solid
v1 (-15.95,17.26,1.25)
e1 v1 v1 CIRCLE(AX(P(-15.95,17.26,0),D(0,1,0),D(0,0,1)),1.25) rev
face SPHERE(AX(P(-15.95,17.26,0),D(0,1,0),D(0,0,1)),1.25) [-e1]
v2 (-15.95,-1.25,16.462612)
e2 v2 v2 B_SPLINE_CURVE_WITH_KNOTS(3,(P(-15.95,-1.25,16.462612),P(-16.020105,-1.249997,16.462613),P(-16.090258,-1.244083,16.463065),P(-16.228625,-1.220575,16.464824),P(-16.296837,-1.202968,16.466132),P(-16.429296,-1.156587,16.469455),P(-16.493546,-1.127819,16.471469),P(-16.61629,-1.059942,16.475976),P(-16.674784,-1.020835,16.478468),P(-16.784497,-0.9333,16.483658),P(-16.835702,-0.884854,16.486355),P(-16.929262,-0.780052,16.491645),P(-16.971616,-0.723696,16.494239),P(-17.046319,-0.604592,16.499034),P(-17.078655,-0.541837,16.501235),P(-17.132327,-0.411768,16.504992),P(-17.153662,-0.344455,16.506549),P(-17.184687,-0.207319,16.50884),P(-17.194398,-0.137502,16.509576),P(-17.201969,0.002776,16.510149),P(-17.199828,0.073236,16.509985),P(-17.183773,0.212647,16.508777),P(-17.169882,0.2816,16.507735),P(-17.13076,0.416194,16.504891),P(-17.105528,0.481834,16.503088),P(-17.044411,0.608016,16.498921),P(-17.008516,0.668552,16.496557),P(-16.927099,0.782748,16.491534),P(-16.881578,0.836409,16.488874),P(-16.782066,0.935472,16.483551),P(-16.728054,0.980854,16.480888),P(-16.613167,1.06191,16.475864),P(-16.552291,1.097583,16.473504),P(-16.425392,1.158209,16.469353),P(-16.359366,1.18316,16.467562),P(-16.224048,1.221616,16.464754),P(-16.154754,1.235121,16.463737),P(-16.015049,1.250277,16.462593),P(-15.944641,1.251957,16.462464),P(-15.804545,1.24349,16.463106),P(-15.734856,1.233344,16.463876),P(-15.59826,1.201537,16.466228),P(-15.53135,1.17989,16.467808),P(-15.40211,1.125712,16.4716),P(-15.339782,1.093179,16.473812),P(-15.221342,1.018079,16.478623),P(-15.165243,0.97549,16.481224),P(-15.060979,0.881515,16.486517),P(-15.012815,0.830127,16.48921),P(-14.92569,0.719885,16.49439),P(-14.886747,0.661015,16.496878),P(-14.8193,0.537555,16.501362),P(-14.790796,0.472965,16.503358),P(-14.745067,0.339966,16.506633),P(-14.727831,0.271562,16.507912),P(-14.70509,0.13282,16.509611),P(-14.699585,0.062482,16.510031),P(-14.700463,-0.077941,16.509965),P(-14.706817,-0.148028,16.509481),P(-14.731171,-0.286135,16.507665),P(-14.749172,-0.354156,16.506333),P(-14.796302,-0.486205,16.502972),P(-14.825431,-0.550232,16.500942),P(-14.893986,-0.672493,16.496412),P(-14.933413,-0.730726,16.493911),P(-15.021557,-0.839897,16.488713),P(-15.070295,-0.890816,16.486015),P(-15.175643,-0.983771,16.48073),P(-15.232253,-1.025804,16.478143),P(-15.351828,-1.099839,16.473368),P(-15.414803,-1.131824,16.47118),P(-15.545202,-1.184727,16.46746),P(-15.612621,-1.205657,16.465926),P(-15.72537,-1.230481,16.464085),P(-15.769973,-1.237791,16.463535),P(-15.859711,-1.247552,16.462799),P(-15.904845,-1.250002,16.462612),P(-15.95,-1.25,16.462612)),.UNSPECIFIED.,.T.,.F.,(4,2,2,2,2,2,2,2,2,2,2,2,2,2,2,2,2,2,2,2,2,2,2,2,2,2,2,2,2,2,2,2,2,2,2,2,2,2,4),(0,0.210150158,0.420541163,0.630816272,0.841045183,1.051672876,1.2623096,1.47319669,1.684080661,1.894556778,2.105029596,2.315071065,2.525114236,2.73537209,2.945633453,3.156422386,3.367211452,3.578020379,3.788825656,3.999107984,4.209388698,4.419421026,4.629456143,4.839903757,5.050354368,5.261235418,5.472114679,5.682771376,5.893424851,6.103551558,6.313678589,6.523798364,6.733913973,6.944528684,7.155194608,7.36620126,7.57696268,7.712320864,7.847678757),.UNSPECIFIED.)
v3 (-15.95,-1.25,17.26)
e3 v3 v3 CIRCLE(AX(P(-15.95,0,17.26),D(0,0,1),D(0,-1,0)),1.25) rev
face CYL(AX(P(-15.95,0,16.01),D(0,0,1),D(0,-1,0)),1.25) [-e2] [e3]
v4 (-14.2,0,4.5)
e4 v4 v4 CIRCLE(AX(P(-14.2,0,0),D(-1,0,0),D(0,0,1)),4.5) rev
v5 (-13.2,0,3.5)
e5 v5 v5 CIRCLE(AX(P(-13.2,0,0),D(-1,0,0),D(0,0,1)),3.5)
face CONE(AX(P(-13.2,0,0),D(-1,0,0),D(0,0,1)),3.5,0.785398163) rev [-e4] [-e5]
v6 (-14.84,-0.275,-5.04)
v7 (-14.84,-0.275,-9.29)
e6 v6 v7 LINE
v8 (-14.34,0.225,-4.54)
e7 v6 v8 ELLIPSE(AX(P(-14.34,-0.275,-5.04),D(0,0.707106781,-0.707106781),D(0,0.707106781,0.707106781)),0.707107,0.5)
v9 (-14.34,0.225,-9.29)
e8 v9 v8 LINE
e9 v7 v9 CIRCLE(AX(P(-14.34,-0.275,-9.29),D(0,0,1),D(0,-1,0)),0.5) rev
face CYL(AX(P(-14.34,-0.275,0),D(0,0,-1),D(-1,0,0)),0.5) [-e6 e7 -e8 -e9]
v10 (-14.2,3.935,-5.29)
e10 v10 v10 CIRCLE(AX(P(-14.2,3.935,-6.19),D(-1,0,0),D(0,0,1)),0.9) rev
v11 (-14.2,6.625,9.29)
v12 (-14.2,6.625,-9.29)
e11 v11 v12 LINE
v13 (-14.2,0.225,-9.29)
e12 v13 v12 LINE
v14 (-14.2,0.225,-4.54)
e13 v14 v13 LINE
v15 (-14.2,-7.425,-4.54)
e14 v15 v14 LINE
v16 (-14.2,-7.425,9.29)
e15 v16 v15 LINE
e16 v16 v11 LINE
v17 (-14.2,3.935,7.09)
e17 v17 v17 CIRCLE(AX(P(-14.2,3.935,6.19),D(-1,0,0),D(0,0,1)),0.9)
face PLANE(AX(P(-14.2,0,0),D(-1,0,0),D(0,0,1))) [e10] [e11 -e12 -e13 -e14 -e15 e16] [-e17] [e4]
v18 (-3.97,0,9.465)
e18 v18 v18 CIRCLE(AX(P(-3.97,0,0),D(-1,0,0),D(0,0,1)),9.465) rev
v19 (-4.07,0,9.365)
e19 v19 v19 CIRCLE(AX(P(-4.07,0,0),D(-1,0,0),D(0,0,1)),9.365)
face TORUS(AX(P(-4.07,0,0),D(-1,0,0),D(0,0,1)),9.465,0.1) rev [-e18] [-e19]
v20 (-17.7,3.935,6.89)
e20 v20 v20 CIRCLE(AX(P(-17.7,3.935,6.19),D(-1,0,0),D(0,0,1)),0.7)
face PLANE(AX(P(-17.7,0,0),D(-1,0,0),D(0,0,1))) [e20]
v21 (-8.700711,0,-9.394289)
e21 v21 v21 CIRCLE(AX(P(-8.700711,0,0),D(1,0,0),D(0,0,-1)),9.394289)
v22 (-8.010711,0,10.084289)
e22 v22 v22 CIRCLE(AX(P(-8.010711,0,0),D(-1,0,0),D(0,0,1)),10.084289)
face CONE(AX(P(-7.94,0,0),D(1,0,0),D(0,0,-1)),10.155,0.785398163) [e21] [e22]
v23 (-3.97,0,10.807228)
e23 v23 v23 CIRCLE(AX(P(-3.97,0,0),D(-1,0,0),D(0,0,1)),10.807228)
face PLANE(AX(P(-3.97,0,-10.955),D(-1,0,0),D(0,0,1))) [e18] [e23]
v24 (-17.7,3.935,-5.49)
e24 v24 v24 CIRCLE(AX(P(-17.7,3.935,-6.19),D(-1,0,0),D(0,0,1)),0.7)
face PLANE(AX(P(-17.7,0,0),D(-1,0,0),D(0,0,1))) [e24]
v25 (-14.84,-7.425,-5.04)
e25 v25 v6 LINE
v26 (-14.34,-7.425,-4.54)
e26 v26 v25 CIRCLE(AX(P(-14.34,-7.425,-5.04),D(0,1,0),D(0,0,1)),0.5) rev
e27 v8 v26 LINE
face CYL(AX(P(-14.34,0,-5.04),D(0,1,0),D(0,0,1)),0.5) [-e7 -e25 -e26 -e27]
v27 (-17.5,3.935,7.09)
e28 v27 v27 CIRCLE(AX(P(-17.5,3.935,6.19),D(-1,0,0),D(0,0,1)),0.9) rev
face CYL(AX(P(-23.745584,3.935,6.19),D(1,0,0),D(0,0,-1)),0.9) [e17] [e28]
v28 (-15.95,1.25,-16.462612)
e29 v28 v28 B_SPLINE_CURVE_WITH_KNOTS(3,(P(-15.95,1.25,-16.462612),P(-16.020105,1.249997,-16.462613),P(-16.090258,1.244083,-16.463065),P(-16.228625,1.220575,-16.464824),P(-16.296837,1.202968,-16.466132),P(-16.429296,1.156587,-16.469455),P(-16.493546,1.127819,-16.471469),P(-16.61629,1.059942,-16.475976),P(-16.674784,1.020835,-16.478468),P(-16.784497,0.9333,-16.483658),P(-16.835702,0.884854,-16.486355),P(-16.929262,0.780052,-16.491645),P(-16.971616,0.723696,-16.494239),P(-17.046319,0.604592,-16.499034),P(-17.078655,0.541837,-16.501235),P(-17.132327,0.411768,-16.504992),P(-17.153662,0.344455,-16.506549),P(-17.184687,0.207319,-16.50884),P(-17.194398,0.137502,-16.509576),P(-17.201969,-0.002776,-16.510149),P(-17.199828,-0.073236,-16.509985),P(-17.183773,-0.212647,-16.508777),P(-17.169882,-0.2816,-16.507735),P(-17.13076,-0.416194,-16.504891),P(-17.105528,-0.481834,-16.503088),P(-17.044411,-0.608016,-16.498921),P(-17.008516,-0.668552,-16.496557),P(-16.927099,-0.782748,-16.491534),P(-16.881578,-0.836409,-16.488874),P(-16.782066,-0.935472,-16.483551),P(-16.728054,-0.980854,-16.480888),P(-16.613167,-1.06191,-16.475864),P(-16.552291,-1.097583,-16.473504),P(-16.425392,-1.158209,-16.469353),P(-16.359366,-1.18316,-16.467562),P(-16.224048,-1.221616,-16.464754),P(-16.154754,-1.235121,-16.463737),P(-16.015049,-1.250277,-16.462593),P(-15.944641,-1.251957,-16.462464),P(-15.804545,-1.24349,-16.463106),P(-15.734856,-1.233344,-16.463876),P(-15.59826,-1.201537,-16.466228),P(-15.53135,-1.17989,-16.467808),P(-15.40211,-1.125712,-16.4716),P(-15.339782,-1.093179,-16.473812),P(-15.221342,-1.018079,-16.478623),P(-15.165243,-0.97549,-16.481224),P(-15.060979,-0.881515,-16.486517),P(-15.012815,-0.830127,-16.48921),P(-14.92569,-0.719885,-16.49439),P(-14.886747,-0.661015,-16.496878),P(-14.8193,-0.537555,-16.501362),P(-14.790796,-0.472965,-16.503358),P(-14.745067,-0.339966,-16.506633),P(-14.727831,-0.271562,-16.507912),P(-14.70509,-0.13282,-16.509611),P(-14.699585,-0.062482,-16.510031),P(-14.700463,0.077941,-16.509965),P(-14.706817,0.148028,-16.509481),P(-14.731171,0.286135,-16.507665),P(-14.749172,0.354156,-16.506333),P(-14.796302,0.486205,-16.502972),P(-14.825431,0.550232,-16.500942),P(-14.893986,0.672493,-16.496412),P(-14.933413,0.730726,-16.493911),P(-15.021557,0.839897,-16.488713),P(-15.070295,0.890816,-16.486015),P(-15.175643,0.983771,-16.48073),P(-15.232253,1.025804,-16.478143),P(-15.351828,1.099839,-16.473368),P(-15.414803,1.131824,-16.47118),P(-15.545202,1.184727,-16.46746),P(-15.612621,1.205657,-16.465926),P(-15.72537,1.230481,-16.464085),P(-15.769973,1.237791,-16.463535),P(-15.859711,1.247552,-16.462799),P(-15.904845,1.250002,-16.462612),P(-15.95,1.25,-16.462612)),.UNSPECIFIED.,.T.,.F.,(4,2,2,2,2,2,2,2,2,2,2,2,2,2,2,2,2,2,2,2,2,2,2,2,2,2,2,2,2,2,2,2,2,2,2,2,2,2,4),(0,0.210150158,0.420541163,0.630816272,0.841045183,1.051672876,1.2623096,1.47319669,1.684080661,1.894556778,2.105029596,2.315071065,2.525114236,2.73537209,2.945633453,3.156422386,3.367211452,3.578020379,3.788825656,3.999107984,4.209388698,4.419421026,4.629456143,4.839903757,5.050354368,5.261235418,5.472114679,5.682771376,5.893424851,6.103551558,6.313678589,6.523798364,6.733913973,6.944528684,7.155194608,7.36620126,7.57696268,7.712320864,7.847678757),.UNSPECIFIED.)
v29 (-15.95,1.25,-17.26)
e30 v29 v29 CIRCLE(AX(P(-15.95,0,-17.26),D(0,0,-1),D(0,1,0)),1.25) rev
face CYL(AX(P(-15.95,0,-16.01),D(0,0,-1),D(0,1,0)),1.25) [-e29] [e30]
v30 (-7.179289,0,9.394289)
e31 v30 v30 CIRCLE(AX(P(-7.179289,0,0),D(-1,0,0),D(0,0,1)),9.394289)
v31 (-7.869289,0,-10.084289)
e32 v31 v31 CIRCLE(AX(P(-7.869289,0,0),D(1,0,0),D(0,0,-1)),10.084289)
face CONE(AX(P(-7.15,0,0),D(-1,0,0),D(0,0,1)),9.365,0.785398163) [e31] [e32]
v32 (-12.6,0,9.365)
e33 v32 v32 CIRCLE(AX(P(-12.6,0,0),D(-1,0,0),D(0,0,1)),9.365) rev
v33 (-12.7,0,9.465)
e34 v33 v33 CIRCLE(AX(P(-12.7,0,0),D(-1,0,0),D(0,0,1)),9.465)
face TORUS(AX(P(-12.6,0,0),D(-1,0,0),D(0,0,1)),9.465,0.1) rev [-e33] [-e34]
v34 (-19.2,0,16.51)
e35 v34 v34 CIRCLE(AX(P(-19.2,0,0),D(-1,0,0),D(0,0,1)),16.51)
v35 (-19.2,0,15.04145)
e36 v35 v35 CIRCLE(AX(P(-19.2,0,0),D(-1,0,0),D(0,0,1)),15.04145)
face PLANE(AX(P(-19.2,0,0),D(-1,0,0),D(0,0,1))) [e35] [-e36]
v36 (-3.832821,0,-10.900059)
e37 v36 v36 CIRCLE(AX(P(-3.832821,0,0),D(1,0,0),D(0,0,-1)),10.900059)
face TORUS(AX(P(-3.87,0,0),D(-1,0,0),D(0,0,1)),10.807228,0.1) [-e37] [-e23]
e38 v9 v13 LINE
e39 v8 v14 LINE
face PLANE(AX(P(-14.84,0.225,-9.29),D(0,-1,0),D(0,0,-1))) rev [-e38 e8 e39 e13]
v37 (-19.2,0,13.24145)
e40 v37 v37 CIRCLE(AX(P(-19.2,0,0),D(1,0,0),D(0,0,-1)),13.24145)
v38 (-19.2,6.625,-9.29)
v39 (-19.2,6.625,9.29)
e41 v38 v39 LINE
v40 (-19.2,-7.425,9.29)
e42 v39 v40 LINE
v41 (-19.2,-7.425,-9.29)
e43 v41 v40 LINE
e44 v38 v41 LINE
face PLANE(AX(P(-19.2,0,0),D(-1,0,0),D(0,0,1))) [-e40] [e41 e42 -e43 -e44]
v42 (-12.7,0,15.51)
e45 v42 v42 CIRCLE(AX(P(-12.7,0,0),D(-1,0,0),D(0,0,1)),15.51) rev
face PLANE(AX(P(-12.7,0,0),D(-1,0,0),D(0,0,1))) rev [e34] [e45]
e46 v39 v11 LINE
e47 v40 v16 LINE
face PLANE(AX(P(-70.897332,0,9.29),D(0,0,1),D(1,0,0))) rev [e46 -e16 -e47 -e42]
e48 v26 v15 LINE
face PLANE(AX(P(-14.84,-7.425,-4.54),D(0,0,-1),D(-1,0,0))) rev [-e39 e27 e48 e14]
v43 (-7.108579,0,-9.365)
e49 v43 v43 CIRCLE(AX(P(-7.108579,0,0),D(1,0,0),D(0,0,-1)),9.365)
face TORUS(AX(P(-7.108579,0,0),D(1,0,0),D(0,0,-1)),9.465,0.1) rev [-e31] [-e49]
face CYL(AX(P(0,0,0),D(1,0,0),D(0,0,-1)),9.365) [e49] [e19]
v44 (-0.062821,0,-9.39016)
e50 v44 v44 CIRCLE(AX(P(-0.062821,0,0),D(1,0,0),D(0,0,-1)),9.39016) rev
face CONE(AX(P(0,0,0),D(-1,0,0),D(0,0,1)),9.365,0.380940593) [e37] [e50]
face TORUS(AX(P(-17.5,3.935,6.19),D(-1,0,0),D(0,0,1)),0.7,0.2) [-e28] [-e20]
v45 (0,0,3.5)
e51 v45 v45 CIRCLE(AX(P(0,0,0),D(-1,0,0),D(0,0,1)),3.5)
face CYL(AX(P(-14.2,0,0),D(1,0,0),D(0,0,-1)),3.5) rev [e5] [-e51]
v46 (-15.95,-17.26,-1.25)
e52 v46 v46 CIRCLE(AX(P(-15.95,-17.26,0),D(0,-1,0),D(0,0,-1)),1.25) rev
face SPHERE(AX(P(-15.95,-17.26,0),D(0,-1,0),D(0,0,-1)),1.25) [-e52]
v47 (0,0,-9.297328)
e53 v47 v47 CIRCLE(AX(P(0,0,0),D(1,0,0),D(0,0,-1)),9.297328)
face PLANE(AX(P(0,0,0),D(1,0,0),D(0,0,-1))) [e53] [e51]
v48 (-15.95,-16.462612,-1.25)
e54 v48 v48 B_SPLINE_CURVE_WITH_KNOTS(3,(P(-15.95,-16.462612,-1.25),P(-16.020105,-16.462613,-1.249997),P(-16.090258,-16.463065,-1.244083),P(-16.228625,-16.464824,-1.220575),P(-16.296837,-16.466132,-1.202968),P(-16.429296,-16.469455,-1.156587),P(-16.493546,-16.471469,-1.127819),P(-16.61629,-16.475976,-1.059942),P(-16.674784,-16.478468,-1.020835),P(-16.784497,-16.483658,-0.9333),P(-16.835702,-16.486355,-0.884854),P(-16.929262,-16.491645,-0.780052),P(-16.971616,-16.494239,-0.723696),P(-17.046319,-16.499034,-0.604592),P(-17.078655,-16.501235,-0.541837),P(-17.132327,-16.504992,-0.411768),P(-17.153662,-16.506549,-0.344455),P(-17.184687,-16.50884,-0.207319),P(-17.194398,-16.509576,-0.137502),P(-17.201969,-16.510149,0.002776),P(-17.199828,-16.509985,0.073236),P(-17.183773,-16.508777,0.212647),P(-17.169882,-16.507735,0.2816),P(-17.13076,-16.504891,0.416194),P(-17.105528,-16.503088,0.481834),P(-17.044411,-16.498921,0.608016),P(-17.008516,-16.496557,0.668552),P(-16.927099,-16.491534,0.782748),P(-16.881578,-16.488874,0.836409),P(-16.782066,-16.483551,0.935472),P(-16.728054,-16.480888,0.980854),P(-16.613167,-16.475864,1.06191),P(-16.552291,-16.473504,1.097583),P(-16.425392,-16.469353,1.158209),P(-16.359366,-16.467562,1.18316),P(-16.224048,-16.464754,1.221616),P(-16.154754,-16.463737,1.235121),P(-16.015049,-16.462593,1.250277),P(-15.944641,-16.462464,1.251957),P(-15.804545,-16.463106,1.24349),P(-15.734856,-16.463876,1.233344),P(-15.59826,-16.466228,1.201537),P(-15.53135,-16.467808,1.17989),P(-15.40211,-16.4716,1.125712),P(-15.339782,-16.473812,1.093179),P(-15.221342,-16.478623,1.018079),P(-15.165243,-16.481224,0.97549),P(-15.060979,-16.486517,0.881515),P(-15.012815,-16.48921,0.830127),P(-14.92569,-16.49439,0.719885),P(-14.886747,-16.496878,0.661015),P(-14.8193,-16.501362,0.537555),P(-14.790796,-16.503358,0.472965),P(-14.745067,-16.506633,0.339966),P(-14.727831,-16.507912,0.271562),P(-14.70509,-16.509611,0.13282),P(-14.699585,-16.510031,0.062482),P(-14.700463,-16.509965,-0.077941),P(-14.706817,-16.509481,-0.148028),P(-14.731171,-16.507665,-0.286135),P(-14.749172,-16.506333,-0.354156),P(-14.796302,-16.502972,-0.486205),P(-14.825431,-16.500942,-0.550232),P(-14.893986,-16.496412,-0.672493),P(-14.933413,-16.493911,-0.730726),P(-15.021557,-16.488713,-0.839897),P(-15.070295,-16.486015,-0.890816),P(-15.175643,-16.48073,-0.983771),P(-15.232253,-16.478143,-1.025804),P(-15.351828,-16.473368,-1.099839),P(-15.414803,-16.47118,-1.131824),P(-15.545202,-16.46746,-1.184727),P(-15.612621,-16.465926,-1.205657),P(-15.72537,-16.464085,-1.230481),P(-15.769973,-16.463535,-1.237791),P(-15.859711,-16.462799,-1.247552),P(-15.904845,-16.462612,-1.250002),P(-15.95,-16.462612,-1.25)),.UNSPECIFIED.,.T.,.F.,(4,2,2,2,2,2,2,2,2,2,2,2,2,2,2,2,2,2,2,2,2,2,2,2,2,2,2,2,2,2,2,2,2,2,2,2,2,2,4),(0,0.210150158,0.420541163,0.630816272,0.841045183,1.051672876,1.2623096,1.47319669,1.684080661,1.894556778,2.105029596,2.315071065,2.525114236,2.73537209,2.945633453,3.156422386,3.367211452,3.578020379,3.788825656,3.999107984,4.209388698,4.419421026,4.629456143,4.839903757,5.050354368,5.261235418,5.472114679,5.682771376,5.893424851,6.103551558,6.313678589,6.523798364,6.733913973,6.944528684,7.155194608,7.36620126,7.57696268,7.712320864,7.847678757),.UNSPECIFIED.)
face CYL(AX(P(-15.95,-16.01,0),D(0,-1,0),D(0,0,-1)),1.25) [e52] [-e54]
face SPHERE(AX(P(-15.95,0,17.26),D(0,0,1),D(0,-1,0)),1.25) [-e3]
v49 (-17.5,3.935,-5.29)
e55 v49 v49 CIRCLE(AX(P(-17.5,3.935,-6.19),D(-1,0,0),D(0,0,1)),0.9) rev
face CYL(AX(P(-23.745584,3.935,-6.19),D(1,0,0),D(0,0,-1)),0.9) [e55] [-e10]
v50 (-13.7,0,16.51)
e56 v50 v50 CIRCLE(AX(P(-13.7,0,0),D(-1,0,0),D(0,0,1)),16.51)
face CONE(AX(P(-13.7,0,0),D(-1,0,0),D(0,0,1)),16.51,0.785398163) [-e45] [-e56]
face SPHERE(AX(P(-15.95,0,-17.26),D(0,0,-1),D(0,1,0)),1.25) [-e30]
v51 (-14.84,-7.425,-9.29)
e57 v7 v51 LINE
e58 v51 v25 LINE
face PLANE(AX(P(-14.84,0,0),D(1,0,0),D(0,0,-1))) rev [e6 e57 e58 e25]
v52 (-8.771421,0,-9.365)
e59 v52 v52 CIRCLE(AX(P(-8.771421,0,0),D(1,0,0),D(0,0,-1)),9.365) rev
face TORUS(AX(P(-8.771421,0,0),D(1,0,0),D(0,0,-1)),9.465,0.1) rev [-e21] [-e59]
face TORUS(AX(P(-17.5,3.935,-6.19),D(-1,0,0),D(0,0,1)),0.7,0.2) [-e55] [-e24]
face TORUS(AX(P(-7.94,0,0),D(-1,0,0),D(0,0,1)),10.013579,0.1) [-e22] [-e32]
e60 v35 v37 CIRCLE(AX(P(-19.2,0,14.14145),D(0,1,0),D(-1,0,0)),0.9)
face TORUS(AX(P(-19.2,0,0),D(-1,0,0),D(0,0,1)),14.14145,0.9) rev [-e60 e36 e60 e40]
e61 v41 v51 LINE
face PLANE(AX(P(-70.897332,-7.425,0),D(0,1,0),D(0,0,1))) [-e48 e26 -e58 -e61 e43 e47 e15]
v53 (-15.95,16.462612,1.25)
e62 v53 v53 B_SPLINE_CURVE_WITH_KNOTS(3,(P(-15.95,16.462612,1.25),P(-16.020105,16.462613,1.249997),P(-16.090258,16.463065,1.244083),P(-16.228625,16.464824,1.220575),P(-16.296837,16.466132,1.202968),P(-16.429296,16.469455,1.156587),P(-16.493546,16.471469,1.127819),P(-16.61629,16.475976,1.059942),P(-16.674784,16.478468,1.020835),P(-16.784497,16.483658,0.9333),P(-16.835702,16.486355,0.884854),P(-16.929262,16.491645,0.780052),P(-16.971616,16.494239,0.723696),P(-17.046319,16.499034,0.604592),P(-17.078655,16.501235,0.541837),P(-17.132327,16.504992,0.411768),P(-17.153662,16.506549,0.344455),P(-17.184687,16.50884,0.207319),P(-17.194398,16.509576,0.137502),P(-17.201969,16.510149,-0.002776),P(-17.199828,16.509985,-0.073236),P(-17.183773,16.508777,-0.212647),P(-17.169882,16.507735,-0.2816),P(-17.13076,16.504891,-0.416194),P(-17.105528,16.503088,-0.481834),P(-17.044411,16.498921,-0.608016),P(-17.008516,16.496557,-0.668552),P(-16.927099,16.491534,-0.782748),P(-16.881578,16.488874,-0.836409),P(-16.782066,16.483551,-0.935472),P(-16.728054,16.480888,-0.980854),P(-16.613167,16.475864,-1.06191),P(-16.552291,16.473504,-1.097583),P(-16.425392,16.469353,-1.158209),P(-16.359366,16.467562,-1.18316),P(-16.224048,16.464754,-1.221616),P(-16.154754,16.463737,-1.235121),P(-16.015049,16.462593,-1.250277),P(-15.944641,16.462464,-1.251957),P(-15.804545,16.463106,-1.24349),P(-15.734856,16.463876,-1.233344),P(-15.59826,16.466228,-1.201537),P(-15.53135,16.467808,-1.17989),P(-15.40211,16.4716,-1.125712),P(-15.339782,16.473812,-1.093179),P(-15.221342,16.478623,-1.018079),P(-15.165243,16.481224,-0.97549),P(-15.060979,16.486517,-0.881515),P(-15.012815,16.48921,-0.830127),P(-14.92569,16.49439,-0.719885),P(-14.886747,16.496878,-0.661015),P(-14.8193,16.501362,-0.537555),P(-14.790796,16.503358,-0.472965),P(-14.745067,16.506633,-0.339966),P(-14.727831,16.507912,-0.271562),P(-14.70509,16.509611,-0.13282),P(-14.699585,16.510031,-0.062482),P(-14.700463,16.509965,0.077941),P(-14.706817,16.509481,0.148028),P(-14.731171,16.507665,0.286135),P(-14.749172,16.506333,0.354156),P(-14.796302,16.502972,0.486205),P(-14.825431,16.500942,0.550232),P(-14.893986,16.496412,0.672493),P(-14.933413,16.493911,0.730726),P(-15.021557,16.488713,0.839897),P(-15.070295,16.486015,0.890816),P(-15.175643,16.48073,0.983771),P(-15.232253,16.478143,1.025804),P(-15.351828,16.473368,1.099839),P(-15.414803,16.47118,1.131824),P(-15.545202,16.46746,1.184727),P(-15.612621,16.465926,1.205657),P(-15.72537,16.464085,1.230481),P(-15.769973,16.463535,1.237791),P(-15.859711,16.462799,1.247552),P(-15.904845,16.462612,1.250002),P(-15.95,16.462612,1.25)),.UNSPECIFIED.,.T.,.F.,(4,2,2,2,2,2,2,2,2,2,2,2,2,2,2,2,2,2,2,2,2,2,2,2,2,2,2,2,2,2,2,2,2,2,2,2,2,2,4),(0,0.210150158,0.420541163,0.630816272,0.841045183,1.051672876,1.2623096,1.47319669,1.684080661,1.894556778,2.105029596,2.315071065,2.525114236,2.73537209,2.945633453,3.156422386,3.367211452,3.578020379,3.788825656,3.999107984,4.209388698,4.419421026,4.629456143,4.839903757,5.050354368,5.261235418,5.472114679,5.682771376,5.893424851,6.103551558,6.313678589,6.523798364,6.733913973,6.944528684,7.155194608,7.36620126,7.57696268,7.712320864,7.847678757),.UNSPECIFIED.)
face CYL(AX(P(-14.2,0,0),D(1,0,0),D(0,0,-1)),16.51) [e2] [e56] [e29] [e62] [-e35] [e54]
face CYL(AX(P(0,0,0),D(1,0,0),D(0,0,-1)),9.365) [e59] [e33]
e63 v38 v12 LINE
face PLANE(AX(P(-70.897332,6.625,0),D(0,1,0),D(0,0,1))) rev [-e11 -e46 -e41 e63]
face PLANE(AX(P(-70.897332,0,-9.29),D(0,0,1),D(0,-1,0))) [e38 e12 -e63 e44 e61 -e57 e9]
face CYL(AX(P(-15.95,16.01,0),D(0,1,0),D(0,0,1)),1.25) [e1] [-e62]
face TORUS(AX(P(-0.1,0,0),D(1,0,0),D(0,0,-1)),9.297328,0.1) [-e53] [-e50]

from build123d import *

# Parameters (mm, degrees)
SKETCH2_R            = 16.51
SKETCH2_R_2          = 3.5
BOSS_EXTRUDE1_DEPTH  = 1.5
SKETCH2_4_R          = 0.9
BOSS_EXTRUDE3_DEPTH  = 5
SKETCH2_5_R          = 3.5
SKETCH2_5_W          = 2.46
SKETCH2_5_H          = 4.35
CUT_EXTRUDE1_DEPTH   = 27.579130911
BOSS_EXTRUDE4_START  = 1.5
SKETCH2_6_R          = 16.51
SKETCH2_6_W          = 18.58
SKETCH2_6_H          = 14.05
BOSS_EXTRUDE4_DEPTH  = 5
FILLET1_R            = 0.1
FILLET4_R            = 0.2
CUT_SWEEP1_PROFILE_R = 0.9
SKETCH17_R           = 1.25
BOSS_EXTRUDE5_DEPTH  = 2
SKETCH17_3_R         = 1.25
BOSS_EXTRUDE6_DEPTH  = 0.5
FILLET6_R            = 1.25
CHAMFER1_SIZE        = 1
SKETCH18_W           = 4.75
SKETCH18_H           = 7.65
BOSS_EXTRUDE7_DEPTH  = 0.64
FILLET7_R            = 0.5
CHAMFER2_SIZE        = 1


# Read off the part's stored shape, not the designer's step: CirPattern10
with BuildPart() as part:
    # Sketch1 → Revolve1 (revolve)
    with BuildSketch(Plane(origin=(0, 0, 0), x_dir=(1, 0, 0), z_dir=(0, 1, 0))):
        Polygon((0, 0), (-12.7, 0), (-12.7, 9.365), (-8.73, 9.365), (-7.94, 10.155), (-7.15, 9.365), (-3.97, 9.365), (-3.97, 10.955), (0, 9.365), align=None)
    revolve(axis=Axis((0, 0, 0), (-1, 0, 0)))

    # Sketch2 → Boss-Extrude1 (add)
    with BuildSketch(Plane.ZY.offset(12.7)):
        Circle(SKETCH2_R)
        Circle(SKETCH2_R_2, mode=Mode.SUBTRACT)
    extrude(amount=BOSS_EXTRUDE1_DEPTH)

    # Sketch2<4> → Boss-Extrude3 (add)
    with BuildSketch(Plane.ZY.offset(12.7)):
        with Locations((6.19, 3.935)):
            Circle(SKETCH2_4_R)
        with Locations((-6.19, 3.935)):
            Circle(SKETCH2_4_R)
    extrude(amount=BOSS_EXTRUDE3_DEPTH)

    # Sketch2<5> → Cut-Extrude1 (cut, through all)
    # profile 1 of 2: a face of its own
    with BuildSketch(Plane.ZY.offset(12.7)):
        Circle(SKETCH2_5_R)
        with Locations((-0.31, 0.56)):
            Rectangle(SKETCH2_5_W, SKETCH2_5_H, mode=Mode.SUBTRACT)
    # profile 2 of 2: a face of its own
    with BuildSketch(Plane.ZY.offset(12.7)):
        with Locations((-0.31, 0.56)):
            Rectangle(SKETCH2_5_W, SKETCH2_5_H)
    extrude(amount=-CUT_EXTRUDE1_DEPTH, mode=Mode.SUBTRACT)

    # Sketch2<6> → Boss-Extrude4 (add)
    with BuildSketch(Plane.ZY.offset(12.7).offset(BOSS_EXTRUDE4_START)):
        Circle(SKETCH2_6_R)
        with Locations((0, -0.4)):
            Rectangle(SKETCH2_6_W, SKETCH2_6_H, mode=Mode.SUBTRACT)
    extrude(amount=BOSS_EXTRUDE4_DEPTH)

    # Fillet1
    fillet1_edges = [part.edges().sort_by_distance(p)[0] for p in [
        (-3.97, 0, 9.365),
        (-3.97, 0, 10.955),
        (0, 0, 9.365),
        (-12.7, 0, 9.365),
        (-8.73, 0, 9.365),
        (-7.94, 0, 10.155),
        (-7.15, 0, 9.365),
    ]]
    fillet(fillet1_edges, radius=FILLET1_R)

    # Fillet4
    fillet4_edges = [part.edges().sort_by_distance(p)[0] for p in [
        (-17.7, 3.935, 5.29),
        (-17.7, 3.935, -7.09),
    ]]
    fillet(fillet4_edges, radius=FILLET4_R)

    # Cut-Sweep1: sweep along a path in Sketch8
    with BuildLine(Plane.ZY.offset(19.2)) as cut_sweep1_path:
        CenterArc((0, 0), 14.14145, 0, 360)
    # Cut-Sweep1 profile (on start of the path) → Cut-Sweep1 (sweep, cut)
    with BuildSketch(Plane(origin=(-19.2, 0, 14.14145), x_dir=(0, 0, 1), z_dir=(0, 1, 0))):
        Circle(CUT_SWEEP1_PROFILE_R)
    sweep(path=cut_sweep1_path.line, mode=Mode.SUBTRACT)



with BuildPart() as body_2:
    # Sketch17 → Boss-Extrude5 (new body)
    with BuildSketch(Plane(origin=(0, -16.51, 0), x_dir=(-1, 0, 0), z_dir=(0, -1, 0))):
        with Locations(Location((15.95, 0, 0), (0, 0, 90))):
            Circle(SKETCH17_R)
    extrude(amount=BOSS_EXTRUDE5_DEPTH)


with BuildPart() as part_1:
    add(part.part)

    add(body_2.part)  # Boss-Extrude6 merges body 2
    # Sketch17<3> → Boss-Extrude6 (add)
    with BuildSketch(Plane(origin=(0, -16.51, 0), x_dir=(-1, 0, 0), z_dir=(0, -1, 0))):
        with Locations(Location((15.95, 0, 0), (0, 0, 90))):
            Circle(SKETCH17_3_R)
    extrude(amount=-BOSS_EXTRUDE6_DEPTH)

    # Fillet6
    fillet6_edges = [part_1.edges().sort_by_distance(p)[0] for p in [
        (-15.95, -18.51, 1.25),
    ]]
    fillet(fillet6_edges, radius=FILLET6_R)

    # CirPattern10 outline → CirPattern10 (revolve)
    with BuildSketch(Plane(origin=(-15.95, 0, 0), x_dir=(1, 0, 0), z_dir=(0, 0, 1))):
        with BuildLine():
            Line((0, 16.462586639), (1.25, 16.462586639))
            Line((1.25, 16.462586639), (1.25, 17.259999999))
            ThreePointArc((1.25, 17.259999999), (0.883883477, 18.143883476), (0, 18.51))
            Line((0, 18.51), (0, 16.462586639))
        make_face()
    revolve(axis=Axis((-15.95, 0, 0), (0, 1, 0)))

    # CirPattern10 2 outline → CirPattern10 2 (revolve)
    with BuildSketch(Plane(origin=(-15.95, 0, 0), x_dir=(1, 0, 0), z_dir=(0, -1, 0))):
        with BuildLine():
            Line((1.25, 16.462592789), (1.25, 17.259999999))
            ThreePointArc((1.25, 17.259999999), (0.883883477, 18.143883476), (0, 18.51))
            Line((0, 18.51), (0, 16.462592789))
            Line((0, 16.462592789), (1.25, 16.462592789))
        make_face()
        with BuildLine():
            Line((1.25, -17.259999999), (1.25, -16.462586639))
            Line((1.25, -16.462586639), (0, -16.462586639))
            Line((0, -16.462586639), (0, -18.51))
            ThreePointArc((0, -18.51), (0.883883477, -18.143883476), (1.25, -17.259999999))
        make_face()
    revolve(axis=Axis((-15.95, 0, 0), (0, 0, 1)))

    # Chamfer1
    chamfer1_edges = [part_1.edges().sort_by_distance(p)[0] for p in [
        (-12.7, 0, -16.51),
    ]]
    chamfer(chamfer1_edges, length=CHAMFER1_SIZE)

    # Sketch18 → Boss-Extrude7 (add)
    with BuildSketch(Plane.ZY.offset(14.2)):
        with Locations((-6.915, -3.6)):
            Rectangle(SKETCH18_W, SKETCH18_H)
    extrude(amount=BOSS_EXTRUDE7_DEPTH)

    # Fillet7
    fillet7_edges = [part_1.edges().sort_by_distance(p)[0] for p in [
        (-14.84, -3.6, -4.54),
        (-14.84, 0.225, -6.915),
    ]]
    fillet(fillet7_edges, radius=FILLET7_R)

    # Chamfer2
    chamfer2_edges = [part_1.edges().sort_by_distance(p)[0] for p in [
        (-14.2, 0, -3.5),
    ]]
    chamfer(chamfer2_edges, length=CHAMFER2_SIZE)


solid = part_1.part
